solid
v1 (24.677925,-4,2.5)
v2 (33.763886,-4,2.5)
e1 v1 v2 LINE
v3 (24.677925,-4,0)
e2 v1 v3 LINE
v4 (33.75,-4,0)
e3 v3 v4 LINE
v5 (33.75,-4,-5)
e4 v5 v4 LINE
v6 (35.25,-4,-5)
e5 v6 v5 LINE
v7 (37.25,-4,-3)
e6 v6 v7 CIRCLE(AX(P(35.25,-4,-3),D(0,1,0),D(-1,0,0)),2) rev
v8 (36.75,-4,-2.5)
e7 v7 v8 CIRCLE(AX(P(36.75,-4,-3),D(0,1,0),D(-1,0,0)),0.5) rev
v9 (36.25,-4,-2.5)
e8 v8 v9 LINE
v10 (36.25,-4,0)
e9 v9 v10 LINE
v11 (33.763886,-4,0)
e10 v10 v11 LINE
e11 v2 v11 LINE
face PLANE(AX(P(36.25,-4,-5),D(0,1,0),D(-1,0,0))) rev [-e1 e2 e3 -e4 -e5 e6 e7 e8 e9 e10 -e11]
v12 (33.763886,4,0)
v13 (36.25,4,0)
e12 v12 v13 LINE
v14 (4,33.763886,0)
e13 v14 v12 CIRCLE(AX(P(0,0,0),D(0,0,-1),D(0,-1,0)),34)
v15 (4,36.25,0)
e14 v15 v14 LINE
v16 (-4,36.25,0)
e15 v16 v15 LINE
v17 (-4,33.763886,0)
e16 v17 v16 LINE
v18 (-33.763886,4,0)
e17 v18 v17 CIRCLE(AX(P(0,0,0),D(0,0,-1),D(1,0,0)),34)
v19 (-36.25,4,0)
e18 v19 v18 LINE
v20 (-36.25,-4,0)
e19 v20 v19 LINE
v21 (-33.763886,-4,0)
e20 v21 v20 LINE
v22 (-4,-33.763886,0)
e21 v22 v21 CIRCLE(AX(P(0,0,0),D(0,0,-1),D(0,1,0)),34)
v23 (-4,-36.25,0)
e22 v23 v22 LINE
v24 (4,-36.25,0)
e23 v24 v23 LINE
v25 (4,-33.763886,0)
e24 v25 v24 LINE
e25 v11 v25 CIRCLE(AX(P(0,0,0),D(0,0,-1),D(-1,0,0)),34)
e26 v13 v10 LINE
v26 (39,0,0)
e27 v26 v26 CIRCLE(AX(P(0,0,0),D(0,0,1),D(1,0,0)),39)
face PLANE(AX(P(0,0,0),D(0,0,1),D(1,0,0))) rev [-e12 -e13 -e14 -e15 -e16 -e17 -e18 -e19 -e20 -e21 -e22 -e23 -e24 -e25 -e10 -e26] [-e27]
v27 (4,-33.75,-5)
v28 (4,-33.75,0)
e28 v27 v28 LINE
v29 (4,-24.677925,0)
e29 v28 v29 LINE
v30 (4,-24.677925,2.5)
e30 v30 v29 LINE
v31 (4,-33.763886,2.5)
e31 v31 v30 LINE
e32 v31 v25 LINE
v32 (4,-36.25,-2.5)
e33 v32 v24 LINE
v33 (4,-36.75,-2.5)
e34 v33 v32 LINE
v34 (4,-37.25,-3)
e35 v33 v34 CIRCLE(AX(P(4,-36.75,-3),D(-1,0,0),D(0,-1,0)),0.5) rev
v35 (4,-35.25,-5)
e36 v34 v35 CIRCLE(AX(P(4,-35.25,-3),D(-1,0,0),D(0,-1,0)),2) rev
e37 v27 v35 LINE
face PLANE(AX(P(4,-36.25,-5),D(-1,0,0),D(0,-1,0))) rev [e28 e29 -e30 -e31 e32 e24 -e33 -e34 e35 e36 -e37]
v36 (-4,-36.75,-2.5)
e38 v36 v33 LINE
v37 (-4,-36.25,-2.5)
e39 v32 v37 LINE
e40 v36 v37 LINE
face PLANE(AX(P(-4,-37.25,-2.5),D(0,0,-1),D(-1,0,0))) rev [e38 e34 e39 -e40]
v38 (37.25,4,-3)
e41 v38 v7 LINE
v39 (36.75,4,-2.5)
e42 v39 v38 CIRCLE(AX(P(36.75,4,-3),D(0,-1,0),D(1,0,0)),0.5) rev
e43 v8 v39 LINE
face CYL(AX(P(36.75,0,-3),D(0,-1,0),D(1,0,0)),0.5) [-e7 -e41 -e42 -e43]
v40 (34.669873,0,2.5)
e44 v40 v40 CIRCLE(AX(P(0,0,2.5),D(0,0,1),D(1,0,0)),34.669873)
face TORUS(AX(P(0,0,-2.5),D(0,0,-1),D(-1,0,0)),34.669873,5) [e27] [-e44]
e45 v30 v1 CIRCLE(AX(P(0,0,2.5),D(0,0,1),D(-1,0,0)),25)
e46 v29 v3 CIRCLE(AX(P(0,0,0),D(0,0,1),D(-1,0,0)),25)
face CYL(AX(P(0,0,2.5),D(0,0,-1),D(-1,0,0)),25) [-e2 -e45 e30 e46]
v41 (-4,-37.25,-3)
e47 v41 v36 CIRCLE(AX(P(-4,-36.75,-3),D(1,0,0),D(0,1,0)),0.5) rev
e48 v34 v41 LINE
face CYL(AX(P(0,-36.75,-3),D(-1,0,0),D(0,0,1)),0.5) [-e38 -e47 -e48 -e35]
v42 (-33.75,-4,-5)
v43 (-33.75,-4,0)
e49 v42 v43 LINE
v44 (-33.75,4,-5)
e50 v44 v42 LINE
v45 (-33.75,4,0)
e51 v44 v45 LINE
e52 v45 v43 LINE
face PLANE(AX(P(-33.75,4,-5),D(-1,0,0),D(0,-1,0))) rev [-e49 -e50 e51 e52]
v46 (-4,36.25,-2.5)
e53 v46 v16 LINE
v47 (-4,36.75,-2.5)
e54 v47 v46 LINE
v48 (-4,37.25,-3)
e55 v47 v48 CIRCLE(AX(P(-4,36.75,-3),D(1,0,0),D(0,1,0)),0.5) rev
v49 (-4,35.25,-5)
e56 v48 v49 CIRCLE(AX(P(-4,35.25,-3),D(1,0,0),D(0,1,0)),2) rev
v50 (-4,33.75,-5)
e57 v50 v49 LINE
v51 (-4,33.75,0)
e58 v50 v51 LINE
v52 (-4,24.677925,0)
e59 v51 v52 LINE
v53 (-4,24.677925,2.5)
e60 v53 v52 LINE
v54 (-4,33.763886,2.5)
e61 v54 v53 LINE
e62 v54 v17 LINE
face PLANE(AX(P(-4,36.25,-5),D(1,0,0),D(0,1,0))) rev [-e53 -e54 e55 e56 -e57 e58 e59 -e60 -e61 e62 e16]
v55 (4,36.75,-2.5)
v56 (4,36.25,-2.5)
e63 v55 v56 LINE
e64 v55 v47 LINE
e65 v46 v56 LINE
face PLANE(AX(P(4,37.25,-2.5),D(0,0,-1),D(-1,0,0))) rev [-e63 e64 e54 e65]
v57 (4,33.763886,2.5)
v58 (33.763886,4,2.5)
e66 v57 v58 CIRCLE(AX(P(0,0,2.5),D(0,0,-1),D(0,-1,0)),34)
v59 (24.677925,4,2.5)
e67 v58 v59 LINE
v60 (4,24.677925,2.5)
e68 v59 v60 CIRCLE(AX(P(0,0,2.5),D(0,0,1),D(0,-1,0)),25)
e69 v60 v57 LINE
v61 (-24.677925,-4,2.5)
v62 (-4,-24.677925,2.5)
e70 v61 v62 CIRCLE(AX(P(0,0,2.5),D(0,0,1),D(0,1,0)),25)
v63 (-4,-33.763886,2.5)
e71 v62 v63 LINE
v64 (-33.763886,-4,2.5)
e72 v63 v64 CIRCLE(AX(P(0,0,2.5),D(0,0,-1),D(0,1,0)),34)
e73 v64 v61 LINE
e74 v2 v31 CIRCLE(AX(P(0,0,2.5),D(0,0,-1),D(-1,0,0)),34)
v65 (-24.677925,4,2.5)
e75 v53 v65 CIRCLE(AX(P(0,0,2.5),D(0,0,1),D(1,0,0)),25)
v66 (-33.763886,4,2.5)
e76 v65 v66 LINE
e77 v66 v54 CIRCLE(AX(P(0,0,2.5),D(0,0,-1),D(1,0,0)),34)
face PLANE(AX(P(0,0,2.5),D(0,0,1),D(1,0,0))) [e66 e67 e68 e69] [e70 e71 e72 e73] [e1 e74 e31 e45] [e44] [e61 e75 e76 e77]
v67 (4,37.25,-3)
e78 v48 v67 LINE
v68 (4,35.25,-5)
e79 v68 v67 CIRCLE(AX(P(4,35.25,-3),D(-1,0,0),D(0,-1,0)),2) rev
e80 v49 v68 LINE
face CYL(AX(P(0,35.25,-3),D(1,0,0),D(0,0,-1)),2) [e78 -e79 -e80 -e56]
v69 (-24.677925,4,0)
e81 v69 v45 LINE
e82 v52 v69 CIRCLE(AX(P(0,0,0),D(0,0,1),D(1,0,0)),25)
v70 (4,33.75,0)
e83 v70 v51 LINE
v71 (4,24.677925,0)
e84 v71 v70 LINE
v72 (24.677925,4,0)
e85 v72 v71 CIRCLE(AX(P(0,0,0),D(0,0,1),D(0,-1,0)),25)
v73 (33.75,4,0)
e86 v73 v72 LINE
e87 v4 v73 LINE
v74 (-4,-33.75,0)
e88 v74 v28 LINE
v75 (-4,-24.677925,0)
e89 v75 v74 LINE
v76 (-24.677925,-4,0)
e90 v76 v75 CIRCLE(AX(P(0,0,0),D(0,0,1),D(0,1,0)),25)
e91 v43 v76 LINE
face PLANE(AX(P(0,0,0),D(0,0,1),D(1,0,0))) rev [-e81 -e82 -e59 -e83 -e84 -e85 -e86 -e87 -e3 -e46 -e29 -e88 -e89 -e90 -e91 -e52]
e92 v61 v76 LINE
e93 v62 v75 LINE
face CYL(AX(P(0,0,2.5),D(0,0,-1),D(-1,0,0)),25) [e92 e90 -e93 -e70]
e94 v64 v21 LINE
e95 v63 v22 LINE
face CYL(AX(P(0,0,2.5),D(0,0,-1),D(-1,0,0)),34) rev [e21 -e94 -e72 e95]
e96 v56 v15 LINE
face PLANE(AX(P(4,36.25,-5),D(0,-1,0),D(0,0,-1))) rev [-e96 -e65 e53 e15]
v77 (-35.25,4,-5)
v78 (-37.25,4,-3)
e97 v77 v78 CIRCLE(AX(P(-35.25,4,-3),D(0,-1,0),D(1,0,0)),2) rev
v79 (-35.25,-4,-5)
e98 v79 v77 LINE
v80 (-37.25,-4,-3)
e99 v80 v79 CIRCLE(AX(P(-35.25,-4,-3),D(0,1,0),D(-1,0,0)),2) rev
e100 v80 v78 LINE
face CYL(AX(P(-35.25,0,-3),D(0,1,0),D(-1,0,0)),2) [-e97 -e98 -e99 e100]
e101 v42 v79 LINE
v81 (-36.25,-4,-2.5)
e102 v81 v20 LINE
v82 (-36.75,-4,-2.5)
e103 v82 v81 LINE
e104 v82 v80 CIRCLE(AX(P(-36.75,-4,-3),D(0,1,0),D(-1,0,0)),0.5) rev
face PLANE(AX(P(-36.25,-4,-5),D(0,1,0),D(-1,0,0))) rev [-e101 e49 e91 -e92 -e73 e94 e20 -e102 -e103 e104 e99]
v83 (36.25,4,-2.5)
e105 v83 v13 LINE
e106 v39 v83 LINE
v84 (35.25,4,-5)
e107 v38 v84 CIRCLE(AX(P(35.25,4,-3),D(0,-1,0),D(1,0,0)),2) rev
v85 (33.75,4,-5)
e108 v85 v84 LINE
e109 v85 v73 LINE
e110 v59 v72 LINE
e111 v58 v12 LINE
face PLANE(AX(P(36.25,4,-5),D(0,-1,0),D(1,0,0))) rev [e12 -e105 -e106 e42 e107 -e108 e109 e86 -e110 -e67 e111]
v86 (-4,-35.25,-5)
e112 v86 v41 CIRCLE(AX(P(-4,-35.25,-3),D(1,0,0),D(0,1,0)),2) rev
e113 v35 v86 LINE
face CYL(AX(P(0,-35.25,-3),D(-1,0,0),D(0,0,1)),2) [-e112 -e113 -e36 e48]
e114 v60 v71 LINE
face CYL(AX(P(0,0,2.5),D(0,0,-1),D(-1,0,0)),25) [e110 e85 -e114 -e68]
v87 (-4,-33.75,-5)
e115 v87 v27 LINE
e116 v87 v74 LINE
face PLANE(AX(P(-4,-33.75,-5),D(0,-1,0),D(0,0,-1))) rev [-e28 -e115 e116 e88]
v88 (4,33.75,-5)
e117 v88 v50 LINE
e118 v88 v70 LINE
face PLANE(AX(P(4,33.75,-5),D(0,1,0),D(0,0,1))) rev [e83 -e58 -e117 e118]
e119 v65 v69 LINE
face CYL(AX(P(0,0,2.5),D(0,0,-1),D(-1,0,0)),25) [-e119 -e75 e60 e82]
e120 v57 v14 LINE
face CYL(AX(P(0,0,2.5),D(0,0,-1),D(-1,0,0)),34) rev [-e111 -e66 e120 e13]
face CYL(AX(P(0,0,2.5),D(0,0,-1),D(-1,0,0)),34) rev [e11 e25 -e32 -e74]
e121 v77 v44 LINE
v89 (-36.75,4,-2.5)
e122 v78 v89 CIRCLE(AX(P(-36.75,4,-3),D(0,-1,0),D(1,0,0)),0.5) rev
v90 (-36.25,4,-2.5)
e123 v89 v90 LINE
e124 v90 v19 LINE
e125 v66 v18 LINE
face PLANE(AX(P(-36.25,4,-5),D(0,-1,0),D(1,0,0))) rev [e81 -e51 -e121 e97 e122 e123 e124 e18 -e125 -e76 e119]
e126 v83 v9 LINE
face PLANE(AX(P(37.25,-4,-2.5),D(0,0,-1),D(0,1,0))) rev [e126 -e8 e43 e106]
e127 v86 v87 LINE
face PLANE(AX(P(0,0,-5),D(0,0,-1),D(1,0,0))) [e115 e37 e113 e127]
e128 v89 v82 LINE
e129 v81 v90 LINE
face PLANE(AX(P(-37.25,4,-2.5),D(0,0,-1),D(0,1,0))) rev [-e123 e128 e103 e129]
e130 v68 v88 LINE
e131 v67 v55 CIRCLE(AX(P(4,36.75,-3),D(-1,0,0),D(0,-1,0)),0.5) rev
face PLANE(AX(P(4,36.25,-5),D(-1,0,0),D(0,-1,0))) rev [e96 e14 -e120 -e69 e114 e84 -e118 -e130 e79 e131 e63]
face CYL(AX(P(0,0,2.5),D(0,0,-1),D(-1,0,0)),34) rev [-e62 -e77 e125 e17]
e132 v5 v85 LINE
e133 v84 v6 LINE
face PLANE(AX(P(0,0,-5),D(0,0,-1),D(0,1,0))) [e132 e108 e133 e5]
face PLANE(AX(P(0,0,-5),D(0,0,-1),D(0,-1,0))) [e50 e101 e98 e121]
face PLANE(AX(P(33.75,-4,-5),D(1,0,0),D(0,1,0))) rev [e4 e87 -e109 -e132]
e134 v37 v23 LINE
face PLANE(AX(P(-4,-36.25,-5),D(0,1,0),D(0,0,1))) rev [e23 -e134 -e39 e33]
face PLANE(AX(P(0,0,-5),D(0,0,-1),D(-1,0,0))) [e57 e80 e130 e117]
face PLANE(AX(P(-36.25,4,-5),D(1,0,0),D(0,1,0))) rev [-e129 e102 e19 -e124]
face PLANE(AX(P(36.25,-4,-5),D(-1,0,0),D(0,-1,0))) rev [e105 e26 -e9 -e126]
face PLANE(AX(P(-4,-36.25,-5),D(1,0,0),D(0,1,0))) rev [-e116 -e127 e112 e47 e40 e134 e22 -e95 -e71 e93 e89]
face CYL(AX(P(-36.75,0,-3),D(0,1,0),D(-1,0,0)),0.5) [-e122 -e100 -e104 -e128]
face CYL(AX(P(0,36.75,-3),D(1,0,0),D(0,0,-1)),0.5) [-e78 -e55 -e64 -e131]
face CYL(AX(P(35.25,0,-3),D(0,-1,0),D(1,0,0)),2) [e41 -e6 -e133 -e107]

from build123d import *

# Parameters (mm, degrees)
SKETCH_1_R                       = 39
EXTRUDE_1_DEPTH                  = 2.5
FILLET_1_R                       = 5
SKETCH_2_W                       = 8
SKETCH_2_H                       = 2.5
EXTRUDE_2_DEPTH                  = 5
SKETCH_3_W                       = 8
SKETCH_3_H                       = 2.5
EXTRUDE_3_DEPTH                  = 1
FILLET_4_R                       = 0.5
FILLET_5_R                       = 2
PATTERN_CIRCULAR_7_COUNT         = 4
FILLET_4_OF_PATTERN_CIRCULAR_7_R = 0.5
FILLET_5_OF_PATTERN_CIRCULAR_7_R = 2
CUT_EXTRUDE_1_DEPTH              = 56.380501984
PATTERN_CIRCULAR_8_COUNT         = 4


# Some blends are built 0.0001 mm under size
with BuildPart() as part:
    # ｽｹｯﾁ1 → ﾎﾞｽ - 押し出し1 (new body)
    with BuildSketch(Plane.XY):
        Circle(SKETCH_1_R)
    extrude(amount=EXTRUDE_1_DEPTH)

    # ﾌｨﾚｯﾄ1
    # the kernel refuses this fillet: 5 mm, written as the material it takes off along each edge
    with BuildSketch(Plane(origin=(0, 0, 2.5), x_dir=(1, 0, 0), z_dir=(0, -1, 0))) as fillet_1_piece_1:
        with BuildLine():
            CenterArc((34.669872981, -5), FILLET_1_R, 30, 60)
            Line((34.669872981, 0), (34.669872981, 0.1))
            Line((34.669872981, 0.1), (39, 0.1))
            Line((39, 0.1), (39.1, 0))
            ThreePointArc((39.1, 0), (39.1, -1.25), (39.08660254, -2.45))
            Line((39.08660254, -2.45), (39, -2.5))
        make_face()
    revolve(axis=Axis((0, 0, 2.5), (0, 0, 1)), mode=Mode.SUBTRACT)

    # ｽｹｯﾁ2 → ﾎﾞｽ - 押し出し2 (add)
    with BuildSketch(Plane(origin=(0, 0, 0), x_dir=(-1, 0, 0), z_dir=(0, 0, -1))):
        with Locations((0, 35)):
            Rectangle(SKETCH_2_W, SKETCH_2_H)
    extrude_2 = extrude(amount=EXTRUDE_2_DEPTH)

    # ｽｹｯﾁ3 → ﾎﾞｽ - 押し出し3 (add)
    with BuildSketch(Plane(origin=(0, 36.25, 0), x_dir=(1, 0, 0), z_dir=(0, 1, 0))):
        with Locations((0, 3.75)):
            Rectangle(SKETCH_3_W, SKETCH_3_H)
    extrude_3 = extrude(amount=EXTRUDE_3_DEPTH)

    # ﾌｨﾚｯﾄ4
    fillet_4_edges = [part.edges().sort_by_distance(p)[0] for p in [
        (0, 37.25, -2.5),
    ]]
    fillet(fillet_4_edges, radius=FILLET_4_R)

    # ﾌｨﾚｯﾄ5
    fillet_5_edges = [part.edges().sort_by_distance(p)[0] for p in [
        (0, 37.25, -5),
    ]]
    fillet(fillet_5_edges, radius=FILLET_5_R - 0.0001)  # a hair under: the kernel refuses the full size

    # 円形ﾊﾟﾀｰﾝ7: ﾎﾞｽ - 押し出し2, ﾎﾞｽ - 押し出し3 ×4 about axis
    pattern_circular_7_axis = Axis((0, 0, 0), (0, 0, 1))
    add([extrude_2.rotate(pattern_circular_7_axis, i * 360 / PATTERN_CIRCULAR_7_COUNT) for i in range(1, PATTERN_CIRCULAR_7_COUNT)])
    add([extrude_3.rotate(pattern_circular_7_axis, i * 360 / PATTERN_CIRCULAR_7_COUNT) for i in range(1, PATTERN_CIRCULAR_7_COUNT)])

    # ﾌｨﾚｯﾄ4 of 円形ﾊﾟﾀｰﾝ7
    fillet_4_of_pattern_circular_7_edges = [part.edges().sort_by_distance(p)[0] for p in [
        (-37.25, 0, -2.5),
        (0, -37.25, -2.5),
        (37.25, 0, -2.5),
    ]]
    fillet(fillet_4_of_pattern_circular_7_edges, radius=FILLET_4_OF_PATTERN_CIRCULAR_7_R)

    # ﾌｨﾚｯﾄ5 of 円形ﾊﾟﾀｰﾝ7
    fillet_5_of_pattern_circular_7_edges = [part.edges().sort_by_distance(p)[0] for p in [
        (-37.25, 0, -5),
        (0, -37.25, -5),
        (37.25, 0, -5),
    ]]
    fillet(fillet_5_of_pattern_circular_7_edges, radius=FILLET_5_OF_PATTERN_CIRCULAR_7_R - 0.0001)  # a hair under: the kernel refuses the full size

    # ｽｹｯﾁ7 → ｶｯﾄ - 押し出し1 (cut, through all)
    with BuildSketch(Plane(origin=(0, 0, 0), x_dir=(-1, 0, 0), z_dir=(0, 0, -1))):
        with BuildLine():
            Line((24.677925359, 4), (33.763886032, 4))
            ThreePointArc((33.763886032, 4), (24.04163056, 24.04163056), (4, 33.763886032))
            Line((4, 33.763886032), (4, 24.677925359))
            ThreePointArc((4, 24.677925359), (17.67766953, 17.67766953), (24.677925359, 4))
        make_face()
    cut_extrude_1 = extrude(amount=-CUT_EXTRUDE_1_DEPTH, mode=Mode.SUBTRACT)

    # 円形ﾊﾟﾀｰﾝ8: ｶｯﾄ - 押し出し1 ×4 about axis
    pattern_circular_8_axis = Axis((0, 0, 0), (0, 0, -1))
    for i in range(1, PATTERN_CIRCULAR_8_COUNT):
        add(cut_extrude_1.rotate(pattern_circular_8_axis, i * 360 / PATTERN_CIRCULAR_8_COUNT), mode=Mode.SUBTRACT)


solid = part.part
